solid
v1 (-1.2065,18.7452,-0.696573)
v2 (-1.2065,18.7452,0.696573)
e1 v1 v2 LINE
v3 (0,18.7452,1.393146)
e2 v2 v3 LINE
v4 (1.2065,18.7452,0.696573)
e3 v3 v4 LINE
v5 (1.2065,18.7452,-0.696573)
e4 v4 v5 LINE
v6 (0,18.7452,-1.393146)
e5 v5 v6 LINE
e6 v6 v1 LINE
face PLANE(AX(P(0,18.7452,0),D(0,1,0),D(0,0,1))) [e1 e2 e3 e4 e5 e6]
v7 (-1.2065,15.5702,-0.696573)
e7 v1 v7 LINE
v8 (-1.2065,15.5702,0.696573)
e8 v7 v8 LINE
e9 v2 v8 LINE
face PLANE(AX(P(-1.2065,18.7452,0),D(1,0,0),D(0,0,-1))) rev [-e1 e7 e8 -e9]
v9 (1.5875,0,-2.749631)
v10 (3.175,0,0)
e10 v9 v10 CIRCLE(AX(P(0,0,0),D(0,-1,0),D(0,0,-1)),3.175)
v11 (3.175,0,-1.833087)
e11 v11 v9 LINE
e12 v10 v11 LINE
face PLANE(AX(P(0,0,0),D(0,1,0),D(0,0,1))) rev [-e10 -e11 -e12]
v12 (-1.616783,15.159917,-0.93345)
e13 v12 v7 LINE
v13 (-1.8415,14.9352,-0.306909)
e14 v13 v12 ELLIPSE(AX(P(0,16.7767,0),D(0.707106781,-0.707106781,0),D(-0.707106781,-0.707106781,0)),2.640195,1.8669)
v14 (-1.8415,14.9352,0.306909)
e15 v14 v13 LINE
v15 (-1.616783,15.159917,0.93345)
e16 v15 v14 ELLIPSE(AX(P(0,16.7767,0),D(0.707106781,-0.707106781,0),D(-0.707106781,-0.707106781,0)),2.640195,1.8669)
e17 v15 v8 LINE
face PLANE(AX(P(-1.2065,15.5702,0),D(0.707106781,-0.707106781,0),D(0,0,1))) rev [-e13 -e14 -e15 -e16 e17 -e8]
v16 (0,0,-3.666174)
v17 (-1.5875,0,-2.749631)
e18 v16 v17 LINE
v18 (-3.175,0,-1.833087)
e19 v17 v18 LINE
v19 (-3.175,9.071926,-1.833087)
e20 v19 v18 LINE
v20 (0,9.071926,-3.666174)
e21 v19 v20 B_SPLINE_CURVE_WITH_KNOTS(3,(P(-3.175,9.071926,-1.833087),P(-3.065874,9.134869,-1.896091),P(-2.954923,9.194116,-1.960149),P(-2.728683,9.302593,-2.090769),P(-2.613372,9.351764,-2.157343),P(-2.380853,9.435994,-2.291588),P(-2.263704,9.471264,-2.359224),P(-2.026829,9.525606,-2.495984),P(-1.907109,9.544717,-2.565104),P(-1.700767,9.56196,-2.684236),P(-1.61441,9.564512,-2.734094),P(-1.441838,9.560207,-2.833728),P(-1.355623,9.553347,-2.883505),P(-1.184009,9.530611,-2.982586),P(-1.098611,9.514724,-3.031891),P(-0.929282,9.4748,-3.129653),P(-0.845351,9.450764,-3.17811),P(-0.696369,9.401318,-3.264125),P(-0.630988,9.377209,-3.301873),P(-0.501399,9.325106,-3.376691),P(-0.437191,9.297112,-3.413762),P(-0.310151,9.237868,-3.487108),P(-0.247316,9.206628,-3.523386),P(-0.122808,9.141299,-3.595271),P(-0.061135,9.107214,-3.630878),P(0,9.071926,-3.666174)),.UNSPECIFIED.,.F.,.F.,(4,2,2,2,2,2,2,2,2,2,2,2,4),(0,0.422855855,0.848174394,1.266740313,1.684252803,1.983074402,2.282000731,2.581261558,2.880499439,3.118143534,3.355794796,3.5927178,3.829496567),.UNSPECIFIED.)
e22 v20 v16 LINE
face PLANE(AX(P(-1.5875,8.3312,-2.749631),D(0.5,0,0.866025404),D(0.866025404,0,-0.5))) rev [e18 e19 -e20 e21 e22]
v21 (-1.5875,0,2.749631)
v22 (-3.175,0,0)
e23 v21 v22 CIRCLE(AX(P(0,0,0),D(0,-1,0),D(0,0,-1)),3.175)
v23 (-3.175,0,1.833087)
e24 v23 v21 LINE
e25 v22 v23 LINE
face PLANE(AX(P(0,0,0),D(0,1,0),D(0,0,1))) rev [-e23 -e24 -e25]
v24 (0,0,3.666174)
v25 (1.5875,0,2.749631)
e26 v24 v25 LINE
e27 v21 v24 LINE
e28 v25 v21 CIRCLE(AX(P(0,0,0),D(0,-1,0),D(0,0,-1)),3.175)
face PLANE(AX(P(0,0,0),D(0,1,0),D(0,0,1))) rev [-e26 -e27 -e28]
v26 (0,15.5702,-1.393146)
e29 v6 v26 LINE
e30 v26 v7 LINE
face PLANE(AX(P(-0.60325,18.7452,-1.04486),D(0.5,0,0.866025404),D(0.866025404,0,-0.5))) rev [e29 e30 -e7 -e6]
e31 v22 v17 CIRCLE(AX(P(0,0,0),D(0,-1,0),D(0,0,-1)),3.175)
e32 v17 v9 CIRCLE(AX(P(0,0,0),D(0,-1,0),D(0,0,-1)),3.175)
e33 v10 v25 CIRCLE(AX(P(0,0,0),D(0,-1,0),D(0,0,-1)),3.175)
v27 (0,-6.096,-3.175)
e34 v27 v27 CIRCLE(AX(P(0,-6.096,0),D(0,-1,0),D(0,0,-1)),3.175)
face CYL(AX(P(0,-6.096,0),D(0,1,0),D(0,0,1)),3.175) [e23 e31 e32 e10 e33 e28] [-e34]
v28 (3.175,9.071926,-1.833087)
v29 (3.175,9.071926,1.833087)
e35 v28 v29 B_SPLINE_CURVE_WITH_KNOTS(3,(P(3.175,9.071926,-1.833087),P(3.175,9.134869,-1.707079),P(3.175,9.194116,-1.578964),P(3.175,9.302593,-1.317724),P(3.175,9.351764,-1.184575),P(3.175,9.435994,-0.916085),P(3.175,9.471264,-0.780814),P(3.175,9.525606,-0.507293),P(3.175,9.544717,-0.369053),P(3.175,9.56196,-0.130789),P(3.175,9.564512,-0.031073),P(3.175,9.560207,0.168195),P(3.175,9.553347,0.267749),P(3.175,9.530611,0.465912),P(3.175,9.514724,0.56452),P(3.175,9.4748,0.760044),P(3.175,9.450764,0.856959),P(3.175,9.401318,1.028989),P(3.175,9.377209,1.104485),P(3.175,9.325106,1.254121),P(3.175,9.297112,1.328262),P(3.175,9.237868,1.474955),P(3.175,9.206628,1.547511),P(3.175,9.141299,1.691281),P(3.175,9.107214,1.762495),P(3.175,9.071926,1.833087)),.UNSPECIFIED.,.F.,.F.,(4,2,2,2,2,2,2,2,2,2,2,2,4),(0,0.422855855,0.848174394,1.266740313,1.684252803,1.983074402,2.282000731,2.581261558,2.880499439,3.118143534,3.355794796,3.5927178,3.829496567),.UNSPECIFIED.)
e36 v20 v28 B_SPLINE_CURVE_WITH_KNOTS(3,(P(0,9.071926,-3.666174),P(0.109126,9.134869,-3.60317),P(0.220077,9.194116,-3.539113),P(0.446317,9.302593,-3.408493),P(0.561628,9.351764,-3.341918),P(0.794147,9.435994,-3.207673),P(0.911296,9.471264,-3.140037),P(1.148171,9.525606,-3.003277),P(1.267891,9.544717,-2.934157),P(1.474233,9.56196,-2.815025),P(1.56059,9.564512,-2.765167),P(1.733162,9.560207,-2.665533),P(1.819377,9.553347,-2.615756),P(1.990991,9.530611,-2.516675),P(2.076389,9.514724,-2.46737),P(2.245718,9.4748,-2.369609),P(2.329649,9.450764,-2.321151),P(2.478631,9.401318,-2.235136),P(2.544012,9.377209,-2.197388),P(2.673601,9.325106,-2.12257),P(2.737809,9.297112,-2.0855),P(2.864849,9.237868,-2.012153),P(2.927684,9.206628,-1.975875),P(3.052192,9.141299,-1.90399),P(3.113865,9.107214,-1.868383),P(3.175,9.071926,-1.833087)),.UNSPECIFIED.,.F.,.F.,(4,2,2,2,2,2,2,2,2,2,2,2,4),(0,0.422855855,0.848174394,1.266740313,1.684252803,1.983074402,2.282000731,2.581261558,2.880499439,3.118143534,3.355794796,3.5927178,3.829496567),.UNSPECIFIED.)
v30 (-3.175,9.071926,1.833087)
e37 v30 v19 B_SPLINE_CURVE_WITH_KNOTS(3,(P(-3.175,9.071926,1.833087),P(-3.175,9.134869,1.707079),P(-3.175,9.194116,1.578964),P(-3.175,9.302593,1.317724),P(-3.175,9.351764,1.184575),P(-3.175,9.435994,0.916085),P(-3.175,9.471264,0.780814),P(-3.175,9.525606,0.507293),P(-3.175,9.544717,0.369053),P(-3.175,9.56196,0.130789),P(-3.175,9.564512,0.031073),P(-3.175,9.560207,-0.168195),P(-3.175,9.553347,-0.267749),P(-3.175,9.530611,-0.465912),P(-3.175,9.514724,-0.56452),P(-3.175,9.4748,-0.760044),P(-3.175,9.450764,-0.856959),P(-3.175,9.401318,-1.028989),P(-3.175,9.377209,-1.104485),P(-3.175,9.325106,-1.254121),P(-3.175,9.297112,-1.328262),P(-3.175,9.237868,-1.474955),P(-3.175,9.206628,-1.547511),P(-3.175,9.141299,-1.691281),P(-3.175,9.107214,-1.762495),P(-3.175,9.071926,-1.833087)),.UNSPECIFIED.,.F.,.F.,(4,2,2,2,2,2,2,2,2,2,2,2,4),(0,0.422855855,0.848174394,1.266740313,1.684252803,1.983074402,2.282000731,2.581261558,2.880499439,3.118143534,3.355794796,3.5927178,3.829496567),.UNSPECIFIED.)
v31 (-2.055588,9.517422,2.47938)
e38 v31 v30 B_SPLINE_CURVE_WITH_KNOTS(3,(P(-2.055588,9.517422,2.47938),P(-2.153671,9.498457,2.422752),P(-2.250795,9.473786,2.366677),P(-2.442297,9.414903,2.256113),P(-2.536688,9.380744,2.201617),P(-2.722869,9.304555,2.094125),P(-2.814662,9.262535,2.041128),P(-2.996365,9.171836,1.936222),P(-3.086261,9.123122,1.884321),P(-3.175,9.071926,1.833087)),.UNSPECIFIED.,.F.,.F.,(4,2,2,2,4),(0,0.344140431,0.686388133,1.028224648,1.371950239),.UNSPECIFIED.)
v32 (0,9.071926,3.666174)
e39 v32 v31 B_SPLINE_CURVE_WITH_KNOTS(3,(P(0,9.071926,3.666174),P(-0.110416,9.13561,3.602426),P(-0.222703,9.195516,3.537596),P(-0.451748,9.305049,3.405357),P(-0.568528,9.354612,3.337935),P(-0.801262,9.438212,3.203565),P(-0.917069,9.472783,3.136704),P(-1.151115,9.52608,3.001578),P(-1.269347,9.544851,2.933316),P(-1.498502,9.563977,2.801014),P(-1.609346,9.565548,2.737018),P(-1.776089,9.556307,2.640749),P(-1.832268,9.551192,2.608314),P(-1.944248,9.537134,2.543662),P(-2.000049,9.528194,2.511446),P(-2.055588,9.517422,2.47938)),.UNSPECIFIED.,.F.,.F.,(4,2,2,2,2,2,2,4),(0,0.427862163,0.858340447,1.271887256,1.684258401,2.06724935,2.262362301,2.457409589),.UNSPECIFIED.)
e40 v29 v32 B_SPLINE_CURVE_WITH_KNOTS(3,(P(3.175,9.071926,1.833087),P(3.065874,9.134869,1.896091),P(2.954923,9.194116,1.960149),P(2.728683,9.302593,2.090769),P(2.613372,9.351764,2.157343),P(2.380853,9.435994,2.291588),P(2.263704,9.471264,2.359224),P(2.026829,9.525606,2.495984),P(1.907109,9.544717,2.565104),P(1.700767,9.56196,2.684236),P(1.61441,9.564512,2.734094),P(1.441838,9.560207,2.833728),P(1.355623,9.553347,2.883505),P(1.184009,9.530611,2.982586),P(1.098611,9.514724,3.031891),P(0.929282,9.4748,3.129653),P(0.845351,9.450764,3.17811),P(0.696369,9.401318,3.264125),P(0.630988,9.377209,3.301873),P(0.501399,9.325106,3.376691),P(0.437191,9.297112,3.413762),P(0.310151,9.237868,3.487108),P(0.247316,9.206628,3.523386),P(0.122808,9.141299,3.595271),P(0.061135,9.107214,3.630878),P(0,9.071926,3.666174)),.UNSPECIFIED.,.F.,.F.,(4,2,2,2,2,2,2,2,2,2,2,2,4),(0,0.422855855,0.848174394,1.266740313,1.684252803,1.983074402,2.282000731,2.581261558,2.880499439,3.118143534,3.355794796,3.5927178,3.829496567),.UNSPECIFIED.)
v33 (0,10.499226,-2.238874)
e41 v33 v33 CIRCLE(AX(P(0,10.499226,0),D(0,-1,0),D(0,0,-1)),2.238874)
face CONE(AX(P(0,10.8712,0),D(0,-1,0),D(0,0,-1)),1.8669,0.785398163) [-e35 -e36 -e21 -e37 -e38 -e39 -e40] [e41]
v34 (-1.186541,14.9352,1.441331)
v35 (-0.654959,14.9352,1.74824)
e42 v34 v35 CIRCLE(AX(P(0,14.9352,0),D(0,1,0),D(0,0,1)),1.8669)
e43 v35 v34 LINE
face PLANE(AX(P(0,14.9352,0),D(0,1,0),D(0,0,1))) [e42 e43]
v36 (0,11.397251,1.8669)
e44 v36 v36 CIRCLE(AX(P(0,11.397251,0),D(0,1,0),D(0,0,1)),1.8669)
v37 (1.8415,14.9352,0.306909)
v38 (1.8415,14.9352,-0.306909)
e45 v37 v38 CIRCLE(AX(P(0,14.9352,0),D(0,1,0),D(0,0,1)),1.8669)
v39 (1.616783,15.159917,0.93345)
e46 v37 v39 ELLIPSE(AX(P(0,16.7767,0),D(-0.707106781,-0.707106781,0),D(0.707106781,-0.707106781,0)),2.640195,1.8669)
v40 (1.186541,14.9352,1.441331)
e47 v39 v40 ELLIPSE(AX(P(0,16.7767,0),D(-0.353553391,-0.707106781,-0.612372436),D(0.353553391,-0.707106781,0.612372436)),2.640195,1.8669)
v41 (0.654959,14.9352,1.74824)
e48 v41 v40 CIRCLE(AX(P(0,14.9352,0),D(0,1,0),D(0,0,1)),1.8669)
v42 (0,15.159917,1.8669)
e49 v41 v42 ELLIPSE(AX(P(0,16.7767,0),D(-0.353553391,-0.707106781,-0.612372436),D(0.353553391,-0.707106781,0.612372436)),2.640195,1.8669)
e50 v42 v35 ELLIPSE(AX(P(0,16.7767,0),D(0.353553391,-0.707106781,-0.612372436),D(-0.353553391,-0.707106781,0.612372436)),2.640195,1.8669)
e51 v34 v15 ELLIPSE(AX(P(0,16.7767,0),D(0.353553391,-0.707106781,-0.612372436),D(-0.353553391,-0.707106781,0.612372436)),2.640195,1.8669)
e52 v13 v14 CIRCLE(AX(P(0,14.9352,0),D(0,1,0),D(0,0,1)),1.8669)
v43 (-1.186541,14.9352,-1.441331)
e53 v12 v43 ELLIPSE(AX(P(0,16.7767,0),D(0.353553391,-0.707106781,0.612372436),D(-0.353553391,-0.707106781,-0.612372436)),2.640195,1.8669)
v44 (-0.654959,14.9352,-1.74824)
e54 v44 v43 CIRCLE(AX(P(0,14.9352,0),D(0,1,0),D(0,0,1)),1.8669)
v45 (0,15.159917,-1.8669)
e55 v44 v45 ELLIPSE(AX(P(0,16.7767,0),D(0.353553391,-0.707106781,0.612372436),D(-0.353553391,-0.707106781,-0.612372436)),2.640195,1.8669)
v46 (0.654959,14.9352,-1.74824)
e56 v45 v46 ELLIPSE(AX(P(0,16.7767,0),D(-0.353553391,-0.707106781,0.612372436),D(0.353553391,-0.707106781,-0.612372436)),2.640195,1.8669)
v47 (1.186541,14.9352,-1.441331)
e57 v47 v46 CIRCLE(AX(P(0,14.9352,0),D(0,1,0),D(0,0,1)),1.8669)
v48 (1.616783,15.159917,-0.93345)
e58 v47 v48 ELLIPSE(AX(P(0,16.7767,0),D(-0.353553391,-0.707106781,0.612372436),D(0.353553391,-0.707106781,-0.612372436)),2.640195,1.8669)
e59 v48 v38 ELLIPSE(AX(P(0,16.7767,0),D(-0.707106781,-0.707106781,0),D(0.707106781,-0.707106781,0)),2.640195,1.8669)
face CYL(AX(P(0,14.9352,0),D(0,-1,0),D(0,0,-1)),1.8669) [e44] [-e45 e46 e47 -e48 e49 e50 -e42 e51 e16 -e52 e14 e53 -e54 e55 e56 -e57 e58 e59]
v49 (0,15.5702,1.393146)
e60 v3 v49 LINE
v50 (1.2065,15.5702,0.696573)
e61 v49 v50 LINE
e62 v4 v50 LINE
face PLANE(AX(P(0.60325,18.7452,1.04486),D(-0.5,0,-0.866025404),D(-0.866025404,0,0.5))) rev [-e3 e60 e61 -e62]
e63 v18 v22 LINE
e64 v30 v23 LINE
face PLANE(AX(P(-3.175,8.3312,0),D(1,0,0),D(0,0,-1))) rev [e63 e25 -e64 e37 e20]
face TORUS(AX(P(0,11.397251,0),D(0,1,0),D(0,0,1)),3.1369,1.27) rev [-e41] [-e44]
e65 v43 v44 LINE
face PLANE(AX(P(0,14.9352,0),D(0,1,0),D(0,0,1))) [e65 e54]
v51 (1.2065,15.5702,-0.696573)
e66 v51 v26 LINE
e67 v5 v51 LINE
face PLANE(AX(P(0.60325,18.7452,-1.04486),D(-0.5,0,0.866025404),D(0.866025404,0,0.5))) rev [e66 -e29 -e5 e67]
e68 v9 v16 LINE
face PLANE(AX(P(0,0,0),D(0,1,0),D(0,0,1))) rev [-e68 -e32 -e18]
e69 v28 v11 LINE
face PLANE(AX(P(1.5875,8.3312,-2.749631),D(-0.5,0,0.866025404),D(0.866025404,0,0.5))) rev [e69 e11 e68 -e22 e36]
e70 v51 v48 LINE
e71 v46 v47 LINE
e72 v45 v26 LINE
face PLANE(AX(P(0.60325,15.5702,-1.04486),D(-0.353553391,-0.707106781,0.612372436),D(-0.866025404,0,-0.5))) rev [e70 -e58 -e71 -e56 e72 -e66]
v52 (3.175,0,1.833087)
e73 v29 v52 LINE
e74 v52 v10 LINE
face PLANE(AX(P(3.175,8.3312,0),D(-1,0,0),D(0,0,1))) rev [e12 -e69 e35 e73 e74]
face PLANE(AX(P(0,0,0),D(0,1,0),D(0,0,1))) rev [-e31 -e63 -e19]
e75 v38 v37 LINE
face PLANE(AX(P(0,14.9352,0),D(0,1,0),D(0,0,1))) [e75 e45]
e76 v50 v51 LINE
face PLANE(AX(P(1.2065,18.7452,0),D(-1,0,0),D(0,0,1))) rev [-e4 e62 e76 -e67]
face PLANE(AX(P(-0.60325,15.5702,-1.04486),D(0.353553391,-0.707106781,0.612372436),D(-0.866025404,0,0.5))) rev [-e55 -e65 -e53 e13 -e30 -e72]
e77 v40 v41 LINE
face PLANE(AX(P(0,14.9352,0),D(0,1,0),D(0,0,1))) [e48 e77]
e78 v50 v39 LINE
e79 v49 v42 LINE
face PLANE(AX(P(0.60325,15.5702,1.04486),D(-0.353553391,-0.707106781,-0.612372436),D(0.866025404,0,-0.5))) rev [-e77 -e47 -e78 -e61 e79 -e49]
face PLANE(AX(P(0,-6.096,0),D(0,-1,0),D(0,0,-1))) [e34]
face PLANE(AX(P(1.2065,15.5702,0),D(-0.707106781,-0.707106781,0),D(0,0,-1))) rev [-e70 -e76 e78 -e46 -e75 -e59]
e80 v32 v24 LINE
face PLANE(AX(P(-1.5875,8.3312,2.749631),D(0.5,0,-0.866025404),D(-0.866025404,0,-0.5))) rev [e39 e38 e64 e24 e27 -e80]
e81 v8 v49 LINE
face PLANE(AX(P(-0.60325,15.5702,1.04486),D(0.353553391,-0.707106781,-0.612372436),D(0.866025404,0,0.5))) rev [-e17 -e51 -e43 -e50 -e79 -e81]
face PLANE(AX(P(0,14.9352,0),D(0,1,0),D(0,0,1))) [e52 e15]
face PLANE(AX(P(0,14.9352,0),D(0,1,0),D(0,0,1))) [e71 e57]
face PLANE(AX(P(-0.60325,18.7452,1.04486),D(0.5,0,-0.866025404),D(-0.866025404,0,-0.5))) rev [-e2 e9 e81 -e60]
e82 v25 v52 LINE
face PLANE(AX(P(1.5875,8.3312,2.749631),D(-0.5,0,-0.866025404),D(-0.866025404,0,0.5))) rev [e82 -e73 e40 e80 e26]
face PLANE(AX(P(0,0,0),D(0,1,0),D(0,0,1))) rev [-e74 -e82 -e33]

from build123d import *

# Parameters (mm, degrees)
BOSS_EXTRUDE1_DEPTH = 8.3312
SKETCH2_R           = 3.175
BOSS_EXTRUDE2_DEPTH = 6.096
SKETCH3_R           = 1.8669
BOSS_EXTRUDE3_DEPTH = 6.604
BOSS_EXTRUDE4_DEPTH = 3.81
CHAMFER1_SIZE       = 0.635
FILLET2_R           = 1.27


with BuildPart() as part:
    # Sketch1 → Boss-Extrude1 (new body)
    with BuildSketch(Plane(origin=(0, 0, 0), x_dir=(1, 0, 0), z_dir=(0, 1, 0))):
        Polygon((0, 3.666174209), (-3.175, 1.833087105), (-3.175, -1.833087105), (0, -3.666174209), (3.175, -1.833087105), (3.175, 1.833087105), align=None)
    extrude(amount=BOSS_EXTRUDE1_DEPTH)

    # Sketch2 → Boss-Extrude2 (add)
    with BuildSketch(Plane.XZ):
        with Locations(Location((0, 0, 0), (0, 0, 60))):
            Circle(SKETCH2_R)
    extrude(amount=BOSS_EXTRUDE2_DEPTH)

    # Sketch3 → Boss-Extrude3 (add)
    with BuildSketch(Plane(origin=(0, 8.3312, 0), x_dir=(1, 0, 0), z_dir=(0, 1, 0))):
        with Locations(Location((0, 0, 0), (0, 0, 90))):
            Circle(SKETCH3_R)
    extrude(amount=BOSS_EXTRUDE3_DEPTH)

    # Sketch4 → Boss-Extrude4 (add)
    with BuildSketch(Plane(origin=(0, 14.9352, 0), x_dir=(1, 0, 0), z_dir=(0, 1, 0))):
        Polygon((0, 1.3931462), (-1.2065, 0.6965731), (-1.2065, -0.6965731), (0, -1.3931462), (1.2065, -0.6965731), (1.2065, 0.6965731), align=None)
    extrude(amount=BOSS_EXTRUDE4_DEPTH)

    # Chamfer1
    # the kernel refuses this chamfer: 0.635 mm, written as the material it adds along each edge
    with BuildSketch(Plane(origin=(2.620735677, 14.9352, 0.119936249), x_dir=(0.4998109584556484, -0.027495876610587288, -0.8656979742248804), z_dir=(-0.8660254037844387, 0, -0.5000000000000001))) as chamfer1_piece_1_section:
        Polygon((CHAMFER1_SIZE * 0.999621916911, -CHAMFER1_SIZE * 0.0274958766106), (-CHAMFER1_SIZE * 0.0274958766106, -CHAMFER1_SIZE * 0.999621916911), (0, 0), align=None)
    chamfer1_piece_1 = extrude(amount=4.659183594, mode=Mode.PRIVATE)
    chamfer1_piece_1 = chamfer1_piece_1 & Plane(origin=(0, 15.158402941, 0), x_dir=(0, 0, -1), z_dir=(0, -1, 0)) * Cylinder(1.8669, 12, mode=Mode.PRIVATE)
    chamfer1_piece_1 = split(chamfer1_piece_1, bisect_by=Plane(origin=(0.439350473, 15.158402941, -1.646805313), z_dir=(0.49999999999999967, 0, 0.8660254037844388)), keep=Keep.TOP, mode=Mode.PRIVATE)
    chamfer1_piece_1 = split(chamfer1_piece_1, bisect_by=Plane(origin=(1.2065, 15.158402941, -1.203891328), z_dir=(-1, 0, 0)), keep=Keep.TOP, mode=Mode.PRIVATE)
    add(chamfer1_piece_1)
    with BuildSketch(Plane(origin=(1.414235677, 14.9352, -2.209655548), x_dir=(-0.49981095845564805, -0.02749587661058727, -0.8656979742248805), z_dir=(-0.8660254037844388, 0, 0.49999999999999967))) as chamfer1_piece_2_section:
        Polygon((CHAMFER1_SIZE * 0.999621916911, -CHAMFER1_SIZE * 0.0274958766106), (-CHAMFER1_SIZE * 0.0274958766106, -CHAMFER1_SIZE * 0.999621916911), (0, 0), align=None)
    chamfer1_piece_2 = extrude(amount=4.659183594, mode=Mode.PRIVATE)
    chamfer1_piece_2 = chamfer1_piece_2 & Plane(origin=(0, 15.158402941, 0), x_dir=(0, 0, -1), z_dir=(0, -1, 0)) * Cylinder(1.8669, 12, mode=Mode.PRIVATE)
    chamfer1_piece_2 = split(chamfer1_piece_2, bisect_by=Plane(origin=(-0.439350472, 15.158402941, -1.646805313), z_dir=(-0.5000000000000001, 0, 0.8660254037844387)), keep=Keep.TOP, mode=Mode.PRIVATE)
    chamfer1_piece_2 = split(chamfer1_piece_2, bisect_by=Plane(origin=(-1.2065, 15.158402941, -1.203891327), z_dir=(1, 0, 0)), keep=Keep.TOP, mode=Mode.PRIVATE)
    add(chamfer1_piece_2)
    with BuildSketch(Plane(origin=(-1.2065, 14.9352, -2.329591797), x_dir=(-0.9996219169112968, -0.027495876610587288, 0), z_dir=(0, 0, 1))) as chamfer1_piece_3_section:
        Polygon((CHAMFER1_SIZE * 0.999621916911, -CHAMFER1_SIZE * 0.0274958766106), (-CHAMFER1_SIZE * 0.0274958766106, -CHAMFER1_SIZE * 0.999621916911), (0, 0), align=None)
    chamfer1_piece_3 = extrude(amount=4.659183594, mode=Mode.PRIVATE)
    chamfer1_piece_3 = chamfer1_piece_3 & Plane(origin=(0, 15.158402941, 0), x_dir=(0, 0, -1), z_dir=(0, -1, 0)) * Cylinder(1.8669, 12, mode=Mode.PRIVATE)
    chamfer1_piece_3 = split(chamfer1_piece_3, bisect_by=Plane(origin=(-1.645850473, 15.158402941, -0.442913986), z_dir=(0.49999999999999967, 0, 0.8660254037844388)), keep=Keep.TOP, mode=Mode.PRIVATE)
    chamfer1_piece_3 = split(chamfer1_piece_3, bisect_by=Plane(origin=(-1.645850472, 15.158402941, 0.442913986), z_dir=(0.5000000000000001, 0, -0.8660254037844386)), keep=Keep.TOP, mode=Mode.PRIVATE)
    add(chamfer1_piece_3)
    with BuildSketch(Plane(origin=(-2.620735677, 14.9352, -0.119936249), x_dir=(-0.4998109584556485, -0.027495876610587288, 0.8656979742248802), z_dir=(0.8660254037844386, 0, 0.5000000000000001))) as chamfer1_piece_4_section:
        Polygon((CHAMFER1_SIZE * 0.999621916911, -CHAMFER1_SIZE * 0.0274958766106), (-CHAMFER1_SIZE * 0.0274958766106, -CHAMFER1_SIZE * 0.999621916911), (0, 0), align=None)
    chamfer1_piece_4 = extrude(amount=4.659183594, mode=Mode.PRIVATE)
    chamfer1_piece_4 = chamfer1_piece_4 & Plane(origin=(0, 15.158402941, 0), x_dir=(0, 0, -1), z_dir=(0, -1, 0)) * Cylinder(1.8669, 12, mode=Mode.PRIVATE)
    chamfer1_piece_4 = split(chamfer1_piece_4, bisect_by=Plane(origin=(-1.2065, 15.158402941, 1.203891327), z_dir=(1, 0, 0)), keep=Keep.TOP, mode=Mode.PRIVATE)
    chamfer1_piece_4 = split(chamfer1_piece_4, bisect_by=Plane(origin=(-0.439350472, 15.158402941, 1.646805313), z_dir=(-0.4999999999999998, 0, -0.8660254037844388)), keep=Keep.TOP, mode=Mode.PRIVATE)
    add(chamfer1_piece_4)
    with BuildSketch(Plane(origin=(-1.414235677, 14.9352, 2.209655548), x_dir=(0.49981095845564816, -0.02749587661058727, 0.8656979742248805), z_dir=(0.8660254037844388, 0, -0.4999999999999998))) as chamfer1_piece_5_section:
        Polygon((CHAMFER1_SIZE * 0.999621916911, -CHAMFER1_SIZE * 0.0274958766106), (-CHAMFER1_SIZE * 0.0274958766106, -CHAMFER1_SIZE * 0.999621916911), (0, 0), align=None)
    chamfer1_piece_5 = extrude(amount=4.659183594, mode=Mode.PRIVATE)
    chamfer1_piece_5 = chamfer1_piece_5 & Plane(origin=(0, 15.158402941, 0), x_dir=(0, 0, -1), z_dir=(0, -1, 0)) * Cylinder(1.8669, 12, mode=Mode.PRIVATE)
    chamfer1_piece_5 = split(chamfer1_piece_5, bisect_by=Plane(origin=(0.439350473, 15.158402941, 1.646805313), z_dir=(0.5000000000000001, 0, -0.8660254037844386)), keep=Keep.TOP, mode=Mode.PRIVATE)
    chamfer1_piece_5 = split(chamfer1_piece_5, bisect_by=Plane(origin=(1.2065, 15.158402941, 1.203891327), z_dir=(-1, 0, 0)), keep=Keep.TOP, mode=Mode.PRIVATE)
    add(chamfer1_piece_5)
    with BuildSketch(Plane(origin=(1.2065, 14.9352, 2.329591797), x_dir=(0.9996219169112968, -0.027495876610587288, 0), z_dir=(0, 0, -1))) as chamfer1_piece_6_section:
        Polygon((CHAMFER1_SIZE * 0.999621916911, -CHAMFER1_SIZE * 0.0274958766106), (-CHAMFER1_SIZE * 0.0274958766106, -CHAMFER1_SIZE * 0.999621916911), (0, 0), align=None)
    chamfer1_piece_6 = extrude(amount=4.659183594, mode=Mode.PRIVATE)
    chamfer1_piece_6 = chamfer1_piece_6 & Plane(origin=(0, 15.158402941, 0), x_dir=(0, 0, -1), z_dir=(0, -1, 0)) * Cylinder(1.8669, 12, mode=Mode.PRIVATE)
    chamfer1_piece_6 = split(chamfer1_piece_6, bisect_by=Plane(origin=(1.645850473, 15.158402941, 0.442913986), z_dir=(-0.4999999999999998, 0, -0.8660254037844388)), keep=Keep.TOP, mode=Mode.PRIVATE)
    chamfer1_piece_6 = split(chamfer1_piece_6, bisect_by=Plane(origin=(1.645850472, 15.158402941, -0.442913986), z_dir=(-0.5000000000000001, 0, 0.8660254037844387)), keep=Keep.TOP, mode=Mode.PRIVATE)
    add(chamfer1_piece_6)
    with BuildSketch(Plane(origin=(1.2065, 14.9352, 2.329591797), x_dir=(0.9996219169112968, -0.027495876610587288, 0), z_dir=(0, 0, -1))) as chamfer1_piece_7a_section:
        Polygon((CHAMFER1_SIZE * 0.999621916911, -CHAMFER1_SIZE * 0.0274958766106), (-CHAMFER1_SIZE * 0.0274958766106, -CHAMFER1_SIZE * 0.999621916911), (0, 0), align=None)
    chamfer1_piece_7a = extrude(amount=4.659183594, mode=Mode.PRIVATE)
    chamfer1_piece_7a = chamfer1_piece_7a & Plane(origin=(0, 15.161928265, 0), x_dir=(0, 0, -1), z_dir=(0, -1, 0)) * Cylinder(1.8669, 12, mode=Mode.PRIVATE)
    chamfer1_piece_7a = split(chamfer1_piece_7a, bisect_by=Plane(origin=(1.244933629, 15.161928265, -0.674383434), z_dir=(0.5000000000000001, 0, -0.8660254037844387)), keep=Keep.TOP, mode=Mode.PRIVATE)
    with BuildSketch(Plane(origin=(2.620735677, 14.9352, 0.119936249), x_dir=(0.4998109584556484, -0.027495876610587288, -0.8656979742248804), z_dir=(-0.8660254037844387, 0, -0.5000000000000001))) as chamfer1_piece_7b_section:
        Polygon((CHAMFER1_SIZE * 0.999621916911, -CHAMFER1_SIZE * 0.0274958766106), (-CHAMFER1_SIZE * 0.0274958766106, -CHAMFER1_SIZE * 0.999621916911), (0, 0), align=None)
    chamfer1_piece_7b = extrude(amount=4.659183594, mode=Mode.PRIVATE)
    chamfer1_piece_7b = chamfer1_piece_7b & Plane(origin=(0, 15.161928264, 0), x_dir=(0, 0, -1), z_dir=(0, -1, 0)) * Cylinder(1.8669, 12, mode=Mode.PRIVATE)
    chamfer1_piece_7b = split(chamfer1_piece_7b, bisect_by=Plane(origin=(1.2065, 15.161928264, -0.740952419), z_dir=(1, 0, 0)), keep=Keep.TOP, mode=Mode.PRIVATE)
    chamfer1_piece_7 = chamfer1_piece_7a & chamfer1_piece_7b
    add(chamfer1_piece_7)
    with BuildSketch(Plane(origin=(1.414235677, 14.9352, -2.209655548), x_dir=(-0.49981095845564805, -0.02749587661058727, -0.8656979742248805), z_dir=(-0.8660254037844388, 0, 0.49999999999999967))) as chamfer1_piece_8a_section:
        Polygon((CHAMFER1_SIZE * 0.999621916911, -CHAMFER1_SIZE * 0.0274958766106), (-CHAMFER1_SIZE * 0.0274958766106, -CHAMFER1_SIZE * 0.999621916911), (0, 0), align=None)
    chamfer1_piece_8a = extrude(amount=4.659183594, mode=Mode.PRIVATE)
    chamfer1_piece_8a = chamfer1_piece_8a & Plane(origin=(0, 15.161928254, 0), x_dir=(0, 0, -1), z_dir=(0, -1, 0)) * Cylinder(1.8669, 12, mode=Mode.PRIVATE)
    chamfer1_piece_8a = split(chamfer1_piece_8a, bisect_by=Plane(origin=(-0.038433634, 15.161928254, -1.415335868), z_dir=(0.5000000000000001, 0, -0.8660254037844387)), keep=Keep.TOP, mode=Mode.PRIVATE)
    with BuildSketch(Plane(origin=(2.620735677, 14.9352, 0.119936249), x_dir=(0.4998109584556484, -0.027495876610587288, -0.8656979742248804), z_dir=(-0.8660254037844387, 0, -0.5000000000000001))) as chamfer1_piece_8b_section:
        Polygon((CHAMFER1_SIZE * 0.999621916911, -CHAMFER1_SIZE * 0.0274958766106), (-CHAMFER1_SIZE * 0.0274958766106, -CHAMFER1_SIZE * 0.999621916911), (0, 0), align=None)
    chamfer1_piece_8b = extrude(amount=4.659183594, mode=Mode.PRIVATE)
    chamfer1_piece_8b = chamfer1_piece_8b & Plane(origin=(0, 15.16192826, 0), x_dir=(0, 0, -1), z_dir=(0, -1, 0)) * Cylinder(1.8669, 12, mode=Mode.PRIVATE)
    chamfer1_piece_8b = split(chamfer1_piece_8b, bisect_by=Plane(origin=(0.038433624, 15.16192826, -1.415335863), z_dir=(-0.49999999999999967, 0, -0.8660254037844388)), keep=Keep.TOP, mode=Mode.PRIVATE)
    chamfer1_piece_8 = chamfer1_piece_8a & chamfer1_piece_8b
    add(chamfer1_piece_8)
    with BuildSketch(Plane(origin=(1.414235677, 14.9352, -2.209655548), x_dir=(-0.49981095845564805, -0.02749587661058727, -0.8656979742248805), z_dir=(-0.8660254037844388, 0, 0.49999999999999967))) as chamfer1_piece_9a_section:
        Polygon((CHAMFER1_SIZE * 0.999621916911, -CHAMFER1_SIZE * 0.0274958766106), (-CHAMFER1_SIZE * 0.0274958766106, -CHAMFER1_SIZE * 0.999621916911), (0, 0), align=None)
    chamfer1_piece_9a = extrude(amount=4.659183594, mode=Mode.PRIVATE)
    chamfer1_piece_9a = chamfer1_piece_9a & Plane(origin=(0, 15.161928258, 0), x_dir=(0, 0, -1), z_dir=(0, -1, 0)) * Cylinder(1.8669, 12, mode=Mode.PRIVATE)
    chamfer1_piece_9a = split(chamfer1_piece_9a, bisect_by=Plane(origin=(-1.2065, 15.161928258, -0.740952435), z_dir=(-1, 0, 0)), keep=Keep.TOP, mode=Mode.PRIVATE)
    with BuildSketch(Plane(origin=(-1.2065, 14.9352, -2.329591797), x_dir=(-0.9996219169112968, -0.027495876610587288, 0), z_dir=(0, 0, 1))) as chamfer1_piece_9b_section:
        Polygon((CHAMFER1_SIZE * 0.999621916911, -CHAMFER1_SIZE * 0.0274958766106), (-CHAMFER1_SIZE * 0.0274958766106, -CHAMFER1_SIZE * 0.999621916911), (0, 0), align=None)
    chamfer1_piece_9b = extrude(amount=4.659183594, mode=Mode.PRIVATE)
    chamfer1_piece_9b = chamfer1_piece_9b & Plane(origin=(0, 15.161928252, 0), x_dir=(0, 0, -1), z_dir=(0, -1, 0)) * Cylinder(1.8669, 12, mode=Mode.PRIVATE)
    chamfer1_piece_9b = split(chamfer1_piece_9b, bisect_by=Plane(origin=(-1.244933623, 15.161928252, -0.674383437), z_dir=(-0.49999999999999967, 0, -0.8660254037844388)), keep=Keep.TOP, mode=Mode.PRIVATE)
    chamfer1_piece_9 = chamfer1_piece_9a & chamfer1_piece_9b
    add(chamfer1_piece_9)
    with BuildSketch(Plane(origin=(-1.2065, 14.9352, -2.329591797), x_dir=(-0.9996219169112968, -0.027495876610587288, 0), z_dir=(0, 0, 1))) as chamfer1_piece_10a_section:
        Polygon((CHAMFER1_SIZE * 0.999621916911, -CHAMFER1_SIZE * 0.0274958766106), (-CHAMFER1_SIZE * 0.0274958766106, -CHAMFER1_SIZE * 0.999621916911), (0, 0), align=None)
    chamfer1_piece_10a = extrude(amount=4.659183594, mode=Mode.PRIVATE)
    chamfer1_piece_10a = chamfer1_piece_10a & Plane(origin=(0, 15.161928265, 0), x_dir=(0, 0, -1), z_dir=(0, -1, 0)) * Cylinder(1.8669, 12, mode=Mode.PRIVATE)
    chamfer1_piece_10a = split(chamfer1_piece_10a, bisect_by=Plane(origin=(-1.244933629, 15.161928265, 0.674383434), z_dir=(-0.5000000000000001, 0, 0.8660254037844386)), keep=Keep.TOP, mode=Mode.PRIVATE)
    with BuildSketch(Plane(origin=(-2.620735677, 14.9352, -0.119936249), x_dir=(-0.4998109584556485, -0.027495876610587288, 0.8656979742248802), z_dir=(0.8660254037844386, 0, 0.5000000000000001))) as chamfer1_piece_10b_section:
        Polygon((CHAMFER1_SIZE * 0.999621916911, -CHAMFER1_SIZE * 0.0274958766106), (-CHAMFER1_SIZE * 0.0274958766106, -CHAMFER1_SIZE * 0.999621916911), (0, 0), align=None)
    chamfer1_piece_10b = extrude(amount=4.659183594, mode=Mode.PRIVATE)
    chamfer1_piece_10b = chamfer1_piece_10b & Plane(origin=(0, 15.161928252, 0), x_dir=(0, 0, -1), z_dir=(0, -1, 0)) * Cylinder(1.8669, 12, mode=Mode.PRIVATE)
    chamfer1_piece_10b = split(chamfer1_piece_10b, bisect_by=Plane(origin=(-1.2065, 15.161928252, 0.740952425), z_dir=(-1, 0, 0)), keep=Keep.TOP, mode=Mode.PRIVATE)
    chamfer1_piece_10 = chamfer1_piece_10a & chamfer1_piece_10b
    add(chamfer1_piece_10)
    with BuildSketch(Plane(origin=(-2.620735677, 14.9352, -0.119936249), x_dir=(-0.4998109584556485, -0.027495876610587288, 0.8656979742248802), z_dir=(0.8660254037844386, 0, 0.5000000000000001))) as chamfer1_piece_11a_section:
        Polygon((CHAMFER1_SIZE * 0.999621916911, -CHAMFER1_SIZE * 0.0274958766106), (-CHAMFER1_SIZE * 0.0274958766106, -CHAMFER1_SIZE * 0.999621916911), (0, 0), align=None)
    chamfer1_piece_11a = extrude(amount=4.659183594, mode=Mode.PRIVATE)
    chamfer1_piece_11a = chamfer1_piece_11a & Plane(origin=(0, 15.161928264, 0), x_dir=(0, 0, -1), z_dir=(0, -1, 0)) * Cylinder(1.8669, 12, mode=Mode.PRIVATE)
    chamfer1_piece_11a = split(chamfer1_piece_11a, bisect_by=Plane(origin=(-0.038433629, 15.161928264, 1.415335866), z_dir=(0.4999999999999998, 0, 0.8660254037844388)), keep=Keep.TOP, mode=Mode.PRIVATE)
    with BuildSketch(Plane(origin=(-1.414235677, 14.9352, 2.209655548), x_dir=(0.49981095845564816, -0.02749587661058727, 0.8656979742248805), z_dir=(0.8660254037844388, 0, -0.4999999999999998))) as chamfer1_piece_11b_section:
        Polygon((CHAMFER1_SIZE * 0.999621916911, -CHAMFER1_SIZE * 0.0274958766106), (-CHAMFER1_SIZE * 0.0274958766106, -CHAMFER1_SIZE * 0.999621916911), (0, 0), align=None)
    chamfer1_piece_11b = extrude(amount=4.659183594, mode=Mode.PRIVATE)
    chamfer1_piece_11b = chamfer1_piece_11b & Plane(origin=(0, 15.161928252, 0), x_dir=(0, 0, -1), z_dir=(0, -1, 0)) * Cylinder(1.8669, 12, mode=Mode.PRIVATE)
    chamfer1_piece_11b = split(chamfer1_piece_11b, bisect_by=Plane(origin=(0.038433623, 15.161928252, 1.415335862), z_dir=(-0.5000000000000001, 0, 0.8660254037844386)), keep=Keep.TOP, mode=Mode.PRIVATE)
    chamfer1_piece_11 = chamfer1_piece_11a & chamfer1_piece_11b
    add(chamfer1_piece_11)
    with BuildSketch(Plane(origin=(-1.414235677, 14.9352, 2.209655548), x_dir=(0.49981095845564816, -0.02749587661058727, 0.8656979742248805), z_dir=(0.8660254037844388, 0, -0.4999999999999998))) as chamfer1_piece_12a_section:
        Polygon((CHAMFER1_SIZE * 0.999621916911, -CHAMFER1_SIZE * 0.0274958766106), (-CHAMFER1_SIZE * 0.0274958766106, -CHAMFER1_SIZE * 0.999621916911), (0, 0), align=None)
    chamfer1_piece_12a = extrude(amount=4.659183594, mode=Mode.PRIVATE)
    chamfer1_piece_12a = chamfer1_piece_12a & Plane(origin=(0, 15.161928264, 0), x_dir=(0, 0, -1), z_dir=(0, -1, 0)) * Cylinder(1.8669, 12, mode=Mode.PRIVATE)
    chamfer1_piece_12a = split(chamfer1_piece_12a, bisect_by=Plane(origin=(1.2065, 15.161928264, 0.740952432), z_dir=(1, 0, 0)), keep=Keep.TOP, mode=Mode.PRIVATE)
    with BuildSketch(Plane(origin=(1.2065, 14.9352, 2.329591797), x_dir=(0.9996219169112968, -0.027495876610587288, 0), z_dir=(0, 0, -1))) as chamfer1_piece_12b_section:
        Polygon((CHAMFER1_SIZE * 0.999621916911, -CHAMFER1_SIZE * 0.0274958766106), (-CHAMFER1_SIZE * 0.0274958766106, -CHAMFER1_SIZE * 0.999621916911), (0, 0), align=None)
    chamfer1_piece_12b = extrude(amount=4.659183594, mode=Mode.PRIVATE)
    chamfer1_piece_12b = chamfer1_piece_12b & Plane(origin=(0, 15.161928252, 0), x_dir=(0, 0, -1), z_dir=(0, -1, 0)) * Cylinder(1.8669, 12, mode=Mode.PRIVATE)
    chamfer1_piece_12b = split(chamfer1_piece_12b, bisect_by=Plane(origin=(1.244933623, 15.161928252, 0.674383437), z_dir=(0.4999999999999998, 0, 0.8660254037844388)), keep=Keep.TOP, mode=Mode.PRIVATE)
    chamfer1_piece_12 = chamfer1_piece_12a & chamfer1_piece_12b
    add(chamfer1_piece_12)

    # Chamfer2
    # the kernel refuses this chamfer: 2.54 mm, written as the material it adds along each edge
    with BuildSketch(Plane(origin=(0, 8.3312, 0), x_dir=(0, 0, -1), z_dir=(1, 0, 0))) as chamfer2_piece_1_section:
        with BuildLine():
            Line((1.795057951, 2.611842049), (4.478742049, -0.071842049))
            Line((4.478742049, -0.071842049), (4.478742049, -0.122642049))
            ThreePointArc((4.478742049, -0.122642049), (3.172821024, -0.0508), (1.8669, -0.0508))
            Line((1.8669, -0.0508), (1.8161, 0))
            ThreePointArc((1.8161, 0), (1.8161, 1.305921024), (1.744257951, 2.611842049))
            Line((1.744257951, 2.611842049), (1.795057951, 2.611842049))
        make_face()
    chamfer2_piece_1 = revolve(axis=Axis((0, 8.3312, 0), (0, 1, 0)), mode=Mode.PRIVATE)
    chamfer2_piece_1 = split(chamfer2_piece_1, bisect_by=Plane(origin=(-2.759048579, 9.982443388, -2.07323677), z_dir=(0.4999999999999998, 0, 0.8660254037844388)), keep=Keep.TOP, mode=Mode.PRIVATE)
    chamfer2_piece_1 = split(chamfer2_piece_1, bisect_by=Plane(origin=(2.759048579, 9.982443388, -2.07323677), z_dir=(-0.5000000000000001, 0, 0.8660254037844386)), keep=Keep.TOP, mode=Mode.PRIVATE)
    chamfer2_piece_1 = split(chamfer2_piece_1, bisect_by=Plane(origin=(-3.175, 9.982443388, 2.705575549), z_dir=(1, 0, 0)), keep=Keep.TOP, mode=Mode.PRIVATE)
    chamfer2_piece_1 = split(chamfer2_piece_1, bisect_by=Plane(origin=(3.175, 9.982443388, 2.705575549), z_dir=(-1, 0, 0)), keep=Keep.TOP, mode=Mode.PRIVATE)
    chamfer2_piece_1 = split(chamfer2_piece_1, bisect_by=Plane(origin=(-0.415951421, 9.982443388, 3.426024544), z_dir=(0.5000000000000001, 0, -0.8660254037844386)), keep=Keep.TOP, mode=Mode.PRIVATE)
    chamfer2_piece_1 = split(chamfer2_piece_1, bisect_by=Plane(origin=(0.415951421, 9.982443388, 3.426024544), z_dir=(-0.5000000000000001, 0, -0.8660254037844386)), keep=Keep.TOP, mode=Mode.PRIVATE)
    add(chamfer2_piece_1)

    # Fillet2
    fillet2_edges = [part.edges().sort_by_distance(p)[0] for p in [
        (0, 10.8712, 1.8669),
    ]]
    fillet(fillet2_edges, radius=FILLET2_R)


solid = part.part
